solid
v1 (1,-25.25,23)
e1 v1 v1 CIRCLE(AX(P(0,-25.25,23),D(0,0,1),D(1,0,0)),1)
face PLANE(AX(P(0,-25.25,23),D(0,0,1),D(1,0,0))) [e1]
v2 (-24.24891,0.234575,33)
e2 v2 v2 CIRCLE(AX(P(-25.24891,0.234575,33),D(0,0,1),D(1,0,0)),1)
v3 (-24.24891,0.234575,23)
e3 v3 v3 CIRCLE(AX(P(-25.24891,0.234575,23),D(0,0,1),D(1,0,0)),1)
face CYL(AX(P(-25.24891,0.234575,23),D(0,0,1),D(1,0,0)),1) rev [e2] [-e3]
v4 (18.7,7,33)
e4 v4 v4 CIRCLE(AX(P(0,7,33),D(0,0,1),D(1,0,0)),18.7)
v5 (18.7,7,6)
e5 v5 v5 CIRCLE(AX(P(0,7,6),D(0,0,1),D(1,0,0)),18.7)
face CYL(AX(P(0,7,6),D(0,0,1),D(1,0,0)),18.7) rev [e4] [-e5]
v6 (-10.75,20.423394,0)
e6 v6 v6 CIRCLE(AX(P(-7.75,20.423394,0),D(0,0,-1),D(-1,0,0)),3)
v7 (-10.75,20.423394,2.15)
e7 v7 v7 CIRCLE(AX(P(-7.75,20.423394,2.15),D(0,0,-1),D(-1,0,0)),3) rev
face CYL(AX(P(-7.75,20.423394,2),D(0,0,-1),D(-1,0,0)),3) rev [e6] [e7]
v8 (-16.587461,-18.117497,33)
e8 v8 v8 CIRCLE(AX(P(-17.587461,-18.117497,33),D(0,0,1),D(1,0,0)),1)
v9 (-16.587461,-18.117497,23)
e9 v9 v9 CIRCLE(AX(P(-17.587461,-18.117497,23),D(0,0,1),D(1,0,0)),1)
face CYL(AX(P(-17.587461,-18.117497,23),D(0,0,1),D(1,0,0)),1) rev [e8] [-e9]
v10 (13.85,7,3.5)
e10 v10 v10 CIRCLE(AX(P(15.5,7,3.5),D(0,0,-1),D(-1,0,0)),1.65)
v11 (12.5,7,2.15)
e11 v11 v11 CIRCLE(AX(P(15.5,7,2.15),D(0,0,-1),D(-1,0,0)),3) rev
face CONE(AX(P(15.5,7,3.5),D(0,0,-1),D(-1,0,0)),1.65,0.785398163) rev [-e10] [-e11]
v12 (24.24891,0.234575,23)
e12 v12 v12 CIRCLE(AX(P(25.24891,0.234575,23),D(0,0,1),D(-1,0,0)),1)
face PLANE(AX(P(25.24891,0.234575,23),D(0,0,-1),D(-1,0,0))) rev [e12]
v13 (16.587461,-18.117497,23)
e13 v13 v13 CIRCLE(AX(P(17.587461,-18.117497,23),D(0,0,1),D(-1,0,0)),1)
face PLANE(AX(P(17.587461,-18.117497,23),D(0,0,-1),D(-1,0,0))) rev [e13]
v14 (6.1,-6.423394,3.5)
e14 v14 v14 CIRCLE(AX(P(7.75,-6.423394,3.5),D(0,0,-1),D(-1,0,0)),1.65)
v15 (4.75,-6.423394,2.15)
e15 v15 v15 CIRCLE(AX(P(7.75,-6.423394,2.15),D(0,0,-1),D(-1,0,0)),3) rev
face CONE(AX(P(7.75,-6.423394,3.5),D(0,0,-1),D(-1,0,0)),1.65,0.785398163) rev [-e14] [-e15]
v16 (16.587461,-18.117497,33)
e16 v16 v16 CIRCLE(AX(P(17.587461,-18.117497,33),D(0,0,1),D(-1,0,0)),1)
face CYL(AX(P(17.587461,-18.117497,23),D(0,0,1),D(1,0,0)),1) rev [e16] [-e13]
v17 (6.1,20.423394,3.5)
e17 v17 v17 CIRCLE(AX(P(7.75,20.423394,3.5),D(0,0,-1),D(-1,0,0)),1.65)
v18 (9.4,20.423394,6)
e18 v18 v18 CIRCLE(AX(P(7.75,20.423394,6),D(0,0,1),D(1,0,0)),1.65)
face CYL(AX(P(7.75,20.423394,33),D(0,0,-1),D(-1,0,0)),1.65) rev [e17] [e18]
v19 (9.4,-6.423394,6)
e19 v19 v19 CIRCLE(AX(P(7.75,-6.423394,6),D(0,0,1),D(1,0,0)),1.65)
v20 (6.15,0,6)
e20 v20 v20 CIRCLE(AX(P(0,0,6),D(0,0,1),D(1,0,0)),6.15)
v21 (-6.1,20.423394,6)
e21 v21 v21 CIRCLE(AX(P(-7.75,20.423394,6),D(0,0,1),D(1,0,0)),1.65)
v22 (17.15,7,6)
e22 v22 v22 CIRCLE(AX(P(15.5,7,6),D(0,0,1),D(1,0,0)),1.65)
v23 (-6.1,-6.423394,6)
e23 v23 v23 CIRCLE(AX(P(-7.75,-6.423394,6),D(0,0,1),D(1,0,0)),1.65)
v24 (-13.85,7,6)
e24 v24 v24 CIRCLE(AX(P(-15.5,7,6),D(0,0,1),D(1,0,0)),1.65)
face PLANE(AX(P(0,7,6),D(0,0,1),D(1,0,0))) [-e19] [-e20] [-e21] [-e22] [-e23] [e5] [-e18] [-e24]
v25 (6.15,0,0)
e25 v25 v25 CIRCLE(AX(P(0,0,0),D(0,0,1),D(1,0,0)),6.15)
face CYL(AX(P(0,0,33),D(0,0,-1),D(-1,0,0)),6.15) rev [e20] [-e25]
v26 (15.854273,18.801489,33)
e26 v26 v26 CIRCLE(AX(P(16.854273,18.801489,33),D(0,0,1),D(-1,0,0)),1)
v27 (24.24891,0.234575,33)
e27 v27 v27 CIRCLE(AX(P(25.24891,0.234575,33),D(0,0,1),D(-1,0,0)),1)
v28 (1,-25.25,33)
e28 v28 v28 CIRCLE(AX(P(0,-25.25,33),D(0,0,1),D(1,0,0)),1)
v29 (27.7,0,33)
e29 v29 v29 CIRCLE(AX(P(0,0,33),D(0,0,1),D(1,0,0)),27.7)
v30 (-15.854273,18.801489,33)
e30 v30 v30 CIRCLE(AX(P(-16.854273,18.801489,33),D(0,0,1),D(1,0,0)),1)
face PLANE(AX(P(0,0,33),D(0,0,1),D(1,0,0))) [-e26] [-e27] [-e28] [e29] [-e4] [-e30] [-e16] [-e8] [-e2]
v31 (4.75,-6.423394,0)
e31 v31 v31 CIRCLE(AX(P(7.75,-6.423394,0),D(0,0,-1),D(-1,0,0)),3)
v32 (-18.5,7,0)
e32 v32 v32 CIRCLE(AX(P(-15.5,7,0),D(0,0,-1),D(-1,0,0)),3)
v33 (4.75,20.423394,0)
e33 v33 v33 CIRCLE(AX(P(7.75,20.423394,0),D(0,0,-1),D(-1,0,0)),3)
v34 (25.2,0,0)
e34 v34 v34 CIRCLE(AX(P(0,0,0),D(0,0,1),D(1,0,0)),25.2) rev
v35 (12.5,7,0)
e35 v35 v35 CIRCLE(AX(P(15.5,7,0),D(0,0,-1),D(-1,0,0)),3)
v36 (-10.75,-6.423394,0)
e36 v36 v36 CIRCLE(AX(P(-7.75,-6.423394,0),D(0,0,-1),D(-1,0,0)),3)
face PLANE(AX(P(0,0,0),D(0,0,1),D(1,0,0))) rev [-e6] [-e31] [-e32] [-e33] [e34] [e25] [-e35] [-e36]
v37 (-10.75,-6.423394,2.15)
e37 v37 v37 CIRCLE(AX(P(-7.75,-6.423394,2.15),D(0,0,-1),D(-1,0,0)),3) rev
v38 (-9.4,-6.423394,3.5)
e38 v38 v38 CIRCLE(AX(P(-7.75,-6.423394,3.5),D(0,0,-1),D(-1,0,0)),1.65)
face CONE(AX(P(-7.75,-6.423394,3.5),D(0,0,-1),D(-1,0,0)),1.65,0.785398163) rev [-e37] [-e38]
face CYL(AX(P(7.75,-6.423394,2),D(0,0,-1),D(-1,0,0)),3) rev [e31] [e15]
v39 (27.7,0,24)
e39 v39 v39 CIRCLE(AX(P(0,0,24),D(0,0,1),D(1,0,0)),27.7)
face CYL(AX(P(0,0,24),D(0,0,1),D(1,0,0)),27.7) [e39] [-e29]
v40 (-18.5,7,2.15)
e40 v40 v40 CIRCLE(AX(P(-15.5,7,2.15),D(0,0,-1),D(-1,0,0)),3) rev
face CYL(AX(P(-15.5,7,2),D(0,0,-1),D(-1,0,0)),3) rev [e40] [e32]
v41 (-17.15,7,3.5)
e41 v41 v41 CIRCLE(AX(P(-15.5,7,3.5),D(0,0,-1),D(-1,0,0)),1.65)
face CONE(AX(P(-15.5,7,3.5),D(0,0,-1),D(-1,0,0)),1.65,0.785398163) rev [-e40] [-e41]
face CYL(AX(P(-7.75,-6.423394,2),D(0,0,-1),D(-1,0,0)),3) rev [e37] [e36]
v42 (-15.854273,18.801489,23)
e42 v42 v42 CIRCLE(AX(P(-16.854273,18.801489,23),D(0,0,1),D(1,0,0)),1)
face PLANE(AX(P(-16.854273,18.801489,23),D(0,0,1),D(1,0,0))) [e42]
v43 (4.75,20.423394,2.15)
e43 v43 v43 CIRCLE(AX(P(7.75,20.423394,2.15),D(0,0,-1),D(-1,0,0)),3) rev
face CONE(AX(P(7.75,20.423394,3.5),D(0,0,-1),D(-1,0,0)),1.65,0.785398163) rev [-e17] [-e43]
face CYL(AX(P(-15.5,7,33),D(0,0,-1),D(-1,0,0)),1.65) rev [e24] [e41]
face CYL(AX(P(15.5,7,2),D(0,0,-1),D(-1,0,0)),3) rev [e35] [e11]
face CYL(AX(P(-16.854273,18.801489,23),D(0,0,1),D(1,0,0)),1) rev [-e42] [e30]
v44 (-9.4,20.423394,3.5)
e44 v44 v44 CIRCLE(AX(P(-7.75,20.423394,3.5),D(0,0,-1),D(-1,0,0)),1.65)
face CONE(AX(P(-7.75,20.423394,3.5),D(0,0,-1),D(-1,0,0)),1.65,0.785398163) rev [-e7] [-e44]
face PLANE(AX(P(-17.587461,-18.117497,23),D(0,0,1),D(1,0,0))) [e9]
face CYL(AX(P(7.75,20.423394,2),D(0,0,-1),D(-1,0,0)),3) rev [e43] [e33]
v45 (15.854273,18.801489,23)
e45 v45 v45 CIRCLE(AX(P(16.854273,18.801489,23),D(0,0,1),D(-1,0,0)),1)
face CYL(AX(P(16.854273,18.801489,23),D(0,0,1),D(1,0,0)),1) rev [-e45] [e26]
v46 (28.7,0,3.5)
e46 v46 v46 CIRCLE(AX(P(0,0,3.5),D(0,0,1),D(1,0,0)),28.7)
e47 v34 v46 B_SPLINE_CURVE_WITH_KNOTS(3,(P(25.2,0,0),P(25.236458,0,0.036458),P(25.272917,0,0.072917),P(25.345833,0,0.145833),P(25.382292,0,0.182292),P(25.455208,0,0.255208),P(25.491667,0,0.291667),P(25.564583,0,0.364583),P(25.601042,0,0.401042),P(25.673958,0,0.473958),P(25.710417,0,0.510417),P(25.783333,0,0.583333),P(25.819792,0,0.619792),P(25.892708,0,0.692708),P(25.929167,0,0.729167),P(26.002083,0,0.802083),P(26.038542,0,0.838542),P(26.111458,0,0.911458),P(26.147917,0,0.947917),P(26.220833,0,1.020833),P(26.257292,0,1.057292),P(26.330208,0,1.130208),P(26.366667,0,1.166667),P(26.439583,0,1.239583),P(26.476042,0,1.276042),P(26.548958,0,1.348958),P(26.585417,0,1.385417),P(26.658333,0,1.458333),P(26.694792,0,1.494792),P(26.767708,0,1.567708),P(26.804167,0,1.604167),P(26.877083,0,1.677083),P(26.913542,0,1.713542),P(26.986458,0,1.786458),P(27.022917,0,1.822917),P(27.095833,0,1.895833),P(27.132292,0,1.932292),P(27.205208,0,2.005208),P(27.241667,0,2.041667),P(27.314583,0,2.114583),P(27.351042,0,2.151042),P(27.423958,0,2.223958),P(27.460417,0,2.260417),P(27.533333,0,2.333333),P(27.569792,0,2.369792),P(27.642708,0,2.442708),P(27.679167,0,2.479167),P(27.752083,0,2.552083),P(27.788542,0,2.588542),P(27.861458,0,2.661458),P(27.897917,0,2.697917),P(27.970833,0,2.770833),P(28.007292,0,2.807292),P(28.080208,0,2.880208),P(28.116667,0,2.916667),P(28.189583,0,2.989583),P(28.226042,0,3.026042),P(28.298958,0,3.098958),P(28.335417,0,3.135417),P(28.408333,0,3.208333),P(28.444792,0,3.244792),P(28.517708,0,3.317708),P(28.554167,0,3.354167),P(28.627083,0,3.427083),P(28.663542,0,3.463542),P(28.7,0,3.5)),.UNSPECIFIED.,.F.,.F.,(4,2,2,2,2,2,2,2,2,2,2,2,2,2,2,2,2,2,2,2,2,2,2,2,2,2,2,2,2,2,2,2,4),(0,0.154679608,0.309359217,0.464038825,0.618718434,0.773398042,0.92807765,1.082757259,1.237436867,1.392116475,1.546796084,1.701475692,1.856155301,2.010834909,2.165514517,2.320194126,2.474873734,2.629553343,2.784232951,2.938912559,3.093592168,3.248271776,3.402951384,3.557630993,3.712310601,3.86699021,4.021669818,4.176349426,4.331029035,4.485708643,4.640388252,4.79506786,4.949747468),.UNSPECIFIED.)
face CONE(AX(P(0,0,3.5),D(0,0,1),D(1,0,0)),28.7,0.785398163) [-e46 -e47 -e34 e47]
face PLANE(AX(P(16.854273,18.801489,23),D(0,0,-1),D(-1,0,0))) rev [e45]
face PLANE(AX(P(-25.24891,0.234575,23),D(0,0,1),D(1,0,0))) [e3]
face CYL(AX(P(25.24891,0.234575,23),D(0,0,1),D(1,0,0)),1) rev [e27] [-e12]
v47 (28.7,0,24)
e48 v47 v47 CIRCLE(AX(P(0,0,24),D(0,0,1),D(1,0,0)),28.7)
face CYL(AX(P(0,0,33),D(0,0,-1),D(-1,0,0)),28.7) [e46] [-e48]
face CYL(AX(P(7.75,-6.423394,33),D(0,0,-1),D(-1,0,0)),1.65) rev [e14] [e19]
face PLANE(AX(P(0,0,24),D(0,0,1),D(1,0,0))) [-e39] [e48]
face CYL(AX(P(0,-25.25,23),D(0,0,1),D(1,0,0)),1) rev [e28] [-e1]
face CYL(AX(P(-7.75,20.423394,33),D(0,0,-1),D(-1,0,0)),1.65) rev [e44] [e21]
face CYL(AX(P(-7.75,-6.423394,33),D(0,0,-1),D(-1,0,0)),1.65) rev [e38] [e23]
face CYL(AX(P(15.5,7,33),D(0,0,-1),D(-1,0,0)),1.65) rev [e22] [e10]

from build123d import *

# Parameters (mm, degrees)
SKETCH1_R              = 28.7
SKETCH1_R_2            = 6.15
SKETCH1_R_3            = 1.65
EXTRUDE_506_DEPTH      = 33
SKETCH2_R              = 18.7
CUT_EXTRUDE_685_DEPTH  = 27
CUT_EXTRUDE_START      = -9
SKETCH4_R              = 28.7
SKETCH4_R_2            = 27.7
CUT_EXTRUDE_817_DEPTH  = 9
SKETCH5_R              = 1
CUT_EXTRUDE_1184_DEPTH = 10
CHAMFER1_SIZE          = 3.5
SKETCH_1_R             = 3
CUT_EXTRUDE_1538_DEPTH = 2
CHAMFER_1590_SIZE      = 1.5


with BuildPart() as part:
    # Sketch1 → Extrude 506 (new body)
    with BuildSketch(Plane.XY):
        Circle(SKETCH1_R)
        Circle(SKETCH1_R_2, mode=Mode.SUBTRACT)
        with Locations((15.5, 7)):
            Circle(SKETCH1_R_3, mode=Mode.SUBTRACT)
        with Locations((7.75, -6.423393759)):
            Circle(SKETCH1_R_3, mode=Mode.SUBTRACT)
        with Locations((-7.75, -6.423393759)):
            Circle(SKETCH1_R_3, mode=Mode.SUBTRACT)
        with Locations((-15.5, 7)):
            Circle(SKETCH1_R_3, mode=Mode.SUBTRACT)
        with Locations((-7.75, 20.423393759)):
            Circle(SKETCH1_R_3, mode=Mode.SUBTRACT)
        with Locations((7.75, 20.423393759)):
            Circle(SKETCH1_R_3, mode=Mode.SUBTRACT)
    extrude(amount=EXTRUDE_506_DEPTH)

    # Sketch2 → Cut-Extrude 685 (cut)
    with BuildSketch(Plane.XY.offset(33)):
        with Locations((0, 7)):
            Circle(SKETCH2_R)
    extrude(amount=-CUT_EXTRUDE_685_DEPTH, mode=Mode.SUBTRACT)

    # Sketch4 → Cut-Extrude 817 (cut)
    with BuildSketch(Plane.XY.offset(33).offset(CUT_EXTRUDE_START)):
        Circle(SKETCH4_R)
        Circle(SKETCH4_R_2, mode=Mode.SUBTRACT)
    extrude(amount=CUT_EXTRUDE_817_DEPTH, mode=Mode.SUBTRACT)

    # Sketch5 → Cut-Extrude 1184 (cut)
    with BuildSketch(Plane.XY.offset(33)):
        with Locations((-25.248910365, 0.234574858)):
            Circle(SKETCH5_R)
        with Locations((-17.587461053, -18.117497446)):
            Circle(SKETCH5_R)
        with Locations(Location((17.587461053, -18.117497446, 0), (0, 0, 180))):
            Circle(SKETCH5_R)
        with Locations(Location((25.248910365, 0.234574858, 0), (0, 0, 180))):
            Circle(SKETCH5_R)
        with Locations((-16.85427288, 18.801488922)):
            Circle(SKETCH5_R)
        with Locations(Location((16.85427288, 18.801488922, 0), (0, 0, 180))):
            Circle(SKETCH5_R)
        with Locations((0, -25.25)):
            Circle(SKETCH5_R)
    extrude(amount=-CUT_EXTRUDE_1184_DEPTH, mode=Mode.SUBTRACT)

    # Chamfer1
    chamfer1_edges = [part.edges().sort_by_distance(p)[0] for p in [
        (-28.7, 0, 0),
    ]]
    chamfer(chamfer1_edges, length=CHAMFER1_SIZE)

    # Эскиз1 → Cut-Extrude 1538 (cut)
    with BuildSketch(Plane(origin=(0, 0, 0), x_dir=(-1, 0, 0), z_dir=(0, 0, -1))):
        with Locations((-7.75, 20.423393759)):
            Circle(SKETCH_1_R)
        with Locations((7.75, 20.423393759)):
            Circle(SKETCH_1_R)
        with Locations((15.5, 7)):
            Circle(SKETCH_1_R)
        with Locations((7.75, -6.423393759)):
            Circle(SKETCH_1_R)
        with Locations((-7.75, -6.423393759)):
            Circle(SKETCH_1_R)
        with Locations((-15.5, 7)):
            Circle(SKETCH_1_R)
    extrude(amount=-CUT_EXTRUDE_1538_DEPTH, mode=Mode.SUBTRACT)

    # Chamfer 1590
    # the kernel refuses this chamfer: 1.5 mm, written as the material it takes off along each edge
    with BuildSketch(Plane(origin=(15.5, 7, 2), x_dir=(1, 0, 0), z_dir=(0, 1, 0))) as chamfer_1590_piece_1_section:
        Polygon((1.65 + CHAMFER_1590_SIZE, 0), (1.65, -CHAMFER_1590_SIZE), (1.65, 0), align=None)
    chamfer_1590_piece_1 = revolve(axis=Axis((15.5, 7, 2), (0, 0, -1)), mode=Mode.PRIVATE)
    chamfer_1590_piece_1 = chamfer_1590_piece_1 & Plane(origin=(15.5, 7, 2.828305934), x_dir=(-1, 0, 0), z_dir=(0, 0, -1)) * Cylinder(3, 13, mode=Mode.PRIVATE)
    add(chamfer_1590_piece_1, mode=Mode.SUBTRACT)
    with BuildSketch(Plane(origin=(7.75, -6.423393759, 2), x_dir=(1, 0, 0), z_dir=(0, 1, 0))) as chamfer_1590_piece_2_section:
        Polygon((1.65 + CHAMFER_1590_SIZE, 0), (1.65, -CHAMFER_1590_SIZE), (1.65, 0), align=None)
    chamfer_1590_piece_2 = revolve(axis=Axis((7.75, -6.423393759, 2), (0, 0, -1)), mode=Mode.PRIVATE)
    chamfer_1590_piece_2 = chamfer_1590_piece_2 & Plane(origin=(7.75, -6.423393759, 2.828305934), x_dir=(-1, 0, 0), z_dir=(0, 0, -1)) * Cylinder(3, 13, mode=Mode.PRIVATE)
    add(chamfer_1590_piece_2, mode=Mode.SUBTRACT)
    with BuildSketch(Plane(origin=(-7.75, -6.423393759, 2), x_dir=(1, 0, 0), z_dir=(0, 1, 0))) as chamfer_1590_piece_3_section:
        Polygon((1.65 + CHAMFER_1590_SIZE, 0), (1.65, -CHAMFER_1590_SIZE), (1.65, 0), align=None)
    chamfer_1590_piece_3 = revolve(axis=Axis((-7.75, -6.423393759, 2), (0, 0, -1)), mode=Mode.PRIVATE)
    chamfer_1590_piece_3 = chamfer_1590_piece_3 & Plane(origin=(-7.75, -6.423393759, 2.828305934), x_dir=(-1, 0, 0), z_dir=(0, 0, -1)) * Cylinder(3, 13, mode=Mode.PRIVATE)
    add(chamfer_1590_piece_3, mode=Mode.SUBTRACT)
    with BuildSketch(Plane(origin=(-15.5, 7, 2), x_dir=(1, 0, 0), z_dir=(0, 1, 0))) as chamfer_1590_piece_4_section:
        Polygon((1.65 + CHAMFER_1590_SIZE, 0), (1.65, -CHAMFER_1590_SIZE), (1.65, 0), align=None)
    chamfer_1590_piece_4 = revolve(axis=Axis((-15.5, 7, 2), (0, 0, -1)), mode=Mode.PRIVATE)
    chamfer_1590_piece_4 = chamfer_1590_piece_4 & Plane(origin=(-15.5, 7, 2.828305934), x_dir=(-1, 0, 0), z_dir=(0, 0, -1)) * Cylinder(3, 13, mode=Mode.PRIVATE)
    add(chamfer_1590_piece_4, mode=Mode.SUBTRACT)
    with BuildSketch(Plane(origin=(-7.75, 20.423393759, 2), x_dir=(1, 0, 0), z_dir=(0, 1, 0))) as chamfer_1590_piece_5_section:
        Polygon((1.65 + CHAMFER_1590_SIZE, 0), (1.65, -CHAMFER_1590_SIZE), (1.65, 0), align=None)
    chamfer_1590_piece_5 = revolve(axis=Axis((-7.75, 20.423393759, 2), (0, 0, -1)), mode=Mode.PRIVATE)
    chamfer_1590_piece_5 = chamfer_1590_piece_5 & Plane(origin=(-7.75, 20.423393759, 2.828305934), x_dir=(-1, 0, 0), z_dir=(0, 0, -1)) * Cylinder(3, 13, mode=Mode.PRIVATE)
    add(chamfer_1590_piece_5, mode=Mode.SUBTRACT)
    with BuildSketch(Plane(origin=(7.75, 20.423393759, 2), x_dir=(1, 0, 0), z_dir=(0, 1, 0))) as chamfer_1590_piece_6_section:
        Polygon((1.65 + CHAMFER_1590_SIZE, 0), (1.65, -CHAMFER_1590_SIZE), (1.65, 0), align=None)
    chamfer_1590_piece_6 = revolve(axis=Axis((7.75, 20.423393759, 2), (0, 0, -1)), mode=Mode.PRIVATE)
    chamfer_1590_piece_6 = chamfer_1590_piece_6 & Plane(origin=(7.75, 20.423393759, 2.828305934), x_dir=(-1, 0, 0), z_dir=(0, 0, -1)) * Cylinder(3, 13, mode=Mode.PRIVATE)
    add(chamfer_1590_piece_6, mode=Mode.SUBTRACT)


solid = part.part
